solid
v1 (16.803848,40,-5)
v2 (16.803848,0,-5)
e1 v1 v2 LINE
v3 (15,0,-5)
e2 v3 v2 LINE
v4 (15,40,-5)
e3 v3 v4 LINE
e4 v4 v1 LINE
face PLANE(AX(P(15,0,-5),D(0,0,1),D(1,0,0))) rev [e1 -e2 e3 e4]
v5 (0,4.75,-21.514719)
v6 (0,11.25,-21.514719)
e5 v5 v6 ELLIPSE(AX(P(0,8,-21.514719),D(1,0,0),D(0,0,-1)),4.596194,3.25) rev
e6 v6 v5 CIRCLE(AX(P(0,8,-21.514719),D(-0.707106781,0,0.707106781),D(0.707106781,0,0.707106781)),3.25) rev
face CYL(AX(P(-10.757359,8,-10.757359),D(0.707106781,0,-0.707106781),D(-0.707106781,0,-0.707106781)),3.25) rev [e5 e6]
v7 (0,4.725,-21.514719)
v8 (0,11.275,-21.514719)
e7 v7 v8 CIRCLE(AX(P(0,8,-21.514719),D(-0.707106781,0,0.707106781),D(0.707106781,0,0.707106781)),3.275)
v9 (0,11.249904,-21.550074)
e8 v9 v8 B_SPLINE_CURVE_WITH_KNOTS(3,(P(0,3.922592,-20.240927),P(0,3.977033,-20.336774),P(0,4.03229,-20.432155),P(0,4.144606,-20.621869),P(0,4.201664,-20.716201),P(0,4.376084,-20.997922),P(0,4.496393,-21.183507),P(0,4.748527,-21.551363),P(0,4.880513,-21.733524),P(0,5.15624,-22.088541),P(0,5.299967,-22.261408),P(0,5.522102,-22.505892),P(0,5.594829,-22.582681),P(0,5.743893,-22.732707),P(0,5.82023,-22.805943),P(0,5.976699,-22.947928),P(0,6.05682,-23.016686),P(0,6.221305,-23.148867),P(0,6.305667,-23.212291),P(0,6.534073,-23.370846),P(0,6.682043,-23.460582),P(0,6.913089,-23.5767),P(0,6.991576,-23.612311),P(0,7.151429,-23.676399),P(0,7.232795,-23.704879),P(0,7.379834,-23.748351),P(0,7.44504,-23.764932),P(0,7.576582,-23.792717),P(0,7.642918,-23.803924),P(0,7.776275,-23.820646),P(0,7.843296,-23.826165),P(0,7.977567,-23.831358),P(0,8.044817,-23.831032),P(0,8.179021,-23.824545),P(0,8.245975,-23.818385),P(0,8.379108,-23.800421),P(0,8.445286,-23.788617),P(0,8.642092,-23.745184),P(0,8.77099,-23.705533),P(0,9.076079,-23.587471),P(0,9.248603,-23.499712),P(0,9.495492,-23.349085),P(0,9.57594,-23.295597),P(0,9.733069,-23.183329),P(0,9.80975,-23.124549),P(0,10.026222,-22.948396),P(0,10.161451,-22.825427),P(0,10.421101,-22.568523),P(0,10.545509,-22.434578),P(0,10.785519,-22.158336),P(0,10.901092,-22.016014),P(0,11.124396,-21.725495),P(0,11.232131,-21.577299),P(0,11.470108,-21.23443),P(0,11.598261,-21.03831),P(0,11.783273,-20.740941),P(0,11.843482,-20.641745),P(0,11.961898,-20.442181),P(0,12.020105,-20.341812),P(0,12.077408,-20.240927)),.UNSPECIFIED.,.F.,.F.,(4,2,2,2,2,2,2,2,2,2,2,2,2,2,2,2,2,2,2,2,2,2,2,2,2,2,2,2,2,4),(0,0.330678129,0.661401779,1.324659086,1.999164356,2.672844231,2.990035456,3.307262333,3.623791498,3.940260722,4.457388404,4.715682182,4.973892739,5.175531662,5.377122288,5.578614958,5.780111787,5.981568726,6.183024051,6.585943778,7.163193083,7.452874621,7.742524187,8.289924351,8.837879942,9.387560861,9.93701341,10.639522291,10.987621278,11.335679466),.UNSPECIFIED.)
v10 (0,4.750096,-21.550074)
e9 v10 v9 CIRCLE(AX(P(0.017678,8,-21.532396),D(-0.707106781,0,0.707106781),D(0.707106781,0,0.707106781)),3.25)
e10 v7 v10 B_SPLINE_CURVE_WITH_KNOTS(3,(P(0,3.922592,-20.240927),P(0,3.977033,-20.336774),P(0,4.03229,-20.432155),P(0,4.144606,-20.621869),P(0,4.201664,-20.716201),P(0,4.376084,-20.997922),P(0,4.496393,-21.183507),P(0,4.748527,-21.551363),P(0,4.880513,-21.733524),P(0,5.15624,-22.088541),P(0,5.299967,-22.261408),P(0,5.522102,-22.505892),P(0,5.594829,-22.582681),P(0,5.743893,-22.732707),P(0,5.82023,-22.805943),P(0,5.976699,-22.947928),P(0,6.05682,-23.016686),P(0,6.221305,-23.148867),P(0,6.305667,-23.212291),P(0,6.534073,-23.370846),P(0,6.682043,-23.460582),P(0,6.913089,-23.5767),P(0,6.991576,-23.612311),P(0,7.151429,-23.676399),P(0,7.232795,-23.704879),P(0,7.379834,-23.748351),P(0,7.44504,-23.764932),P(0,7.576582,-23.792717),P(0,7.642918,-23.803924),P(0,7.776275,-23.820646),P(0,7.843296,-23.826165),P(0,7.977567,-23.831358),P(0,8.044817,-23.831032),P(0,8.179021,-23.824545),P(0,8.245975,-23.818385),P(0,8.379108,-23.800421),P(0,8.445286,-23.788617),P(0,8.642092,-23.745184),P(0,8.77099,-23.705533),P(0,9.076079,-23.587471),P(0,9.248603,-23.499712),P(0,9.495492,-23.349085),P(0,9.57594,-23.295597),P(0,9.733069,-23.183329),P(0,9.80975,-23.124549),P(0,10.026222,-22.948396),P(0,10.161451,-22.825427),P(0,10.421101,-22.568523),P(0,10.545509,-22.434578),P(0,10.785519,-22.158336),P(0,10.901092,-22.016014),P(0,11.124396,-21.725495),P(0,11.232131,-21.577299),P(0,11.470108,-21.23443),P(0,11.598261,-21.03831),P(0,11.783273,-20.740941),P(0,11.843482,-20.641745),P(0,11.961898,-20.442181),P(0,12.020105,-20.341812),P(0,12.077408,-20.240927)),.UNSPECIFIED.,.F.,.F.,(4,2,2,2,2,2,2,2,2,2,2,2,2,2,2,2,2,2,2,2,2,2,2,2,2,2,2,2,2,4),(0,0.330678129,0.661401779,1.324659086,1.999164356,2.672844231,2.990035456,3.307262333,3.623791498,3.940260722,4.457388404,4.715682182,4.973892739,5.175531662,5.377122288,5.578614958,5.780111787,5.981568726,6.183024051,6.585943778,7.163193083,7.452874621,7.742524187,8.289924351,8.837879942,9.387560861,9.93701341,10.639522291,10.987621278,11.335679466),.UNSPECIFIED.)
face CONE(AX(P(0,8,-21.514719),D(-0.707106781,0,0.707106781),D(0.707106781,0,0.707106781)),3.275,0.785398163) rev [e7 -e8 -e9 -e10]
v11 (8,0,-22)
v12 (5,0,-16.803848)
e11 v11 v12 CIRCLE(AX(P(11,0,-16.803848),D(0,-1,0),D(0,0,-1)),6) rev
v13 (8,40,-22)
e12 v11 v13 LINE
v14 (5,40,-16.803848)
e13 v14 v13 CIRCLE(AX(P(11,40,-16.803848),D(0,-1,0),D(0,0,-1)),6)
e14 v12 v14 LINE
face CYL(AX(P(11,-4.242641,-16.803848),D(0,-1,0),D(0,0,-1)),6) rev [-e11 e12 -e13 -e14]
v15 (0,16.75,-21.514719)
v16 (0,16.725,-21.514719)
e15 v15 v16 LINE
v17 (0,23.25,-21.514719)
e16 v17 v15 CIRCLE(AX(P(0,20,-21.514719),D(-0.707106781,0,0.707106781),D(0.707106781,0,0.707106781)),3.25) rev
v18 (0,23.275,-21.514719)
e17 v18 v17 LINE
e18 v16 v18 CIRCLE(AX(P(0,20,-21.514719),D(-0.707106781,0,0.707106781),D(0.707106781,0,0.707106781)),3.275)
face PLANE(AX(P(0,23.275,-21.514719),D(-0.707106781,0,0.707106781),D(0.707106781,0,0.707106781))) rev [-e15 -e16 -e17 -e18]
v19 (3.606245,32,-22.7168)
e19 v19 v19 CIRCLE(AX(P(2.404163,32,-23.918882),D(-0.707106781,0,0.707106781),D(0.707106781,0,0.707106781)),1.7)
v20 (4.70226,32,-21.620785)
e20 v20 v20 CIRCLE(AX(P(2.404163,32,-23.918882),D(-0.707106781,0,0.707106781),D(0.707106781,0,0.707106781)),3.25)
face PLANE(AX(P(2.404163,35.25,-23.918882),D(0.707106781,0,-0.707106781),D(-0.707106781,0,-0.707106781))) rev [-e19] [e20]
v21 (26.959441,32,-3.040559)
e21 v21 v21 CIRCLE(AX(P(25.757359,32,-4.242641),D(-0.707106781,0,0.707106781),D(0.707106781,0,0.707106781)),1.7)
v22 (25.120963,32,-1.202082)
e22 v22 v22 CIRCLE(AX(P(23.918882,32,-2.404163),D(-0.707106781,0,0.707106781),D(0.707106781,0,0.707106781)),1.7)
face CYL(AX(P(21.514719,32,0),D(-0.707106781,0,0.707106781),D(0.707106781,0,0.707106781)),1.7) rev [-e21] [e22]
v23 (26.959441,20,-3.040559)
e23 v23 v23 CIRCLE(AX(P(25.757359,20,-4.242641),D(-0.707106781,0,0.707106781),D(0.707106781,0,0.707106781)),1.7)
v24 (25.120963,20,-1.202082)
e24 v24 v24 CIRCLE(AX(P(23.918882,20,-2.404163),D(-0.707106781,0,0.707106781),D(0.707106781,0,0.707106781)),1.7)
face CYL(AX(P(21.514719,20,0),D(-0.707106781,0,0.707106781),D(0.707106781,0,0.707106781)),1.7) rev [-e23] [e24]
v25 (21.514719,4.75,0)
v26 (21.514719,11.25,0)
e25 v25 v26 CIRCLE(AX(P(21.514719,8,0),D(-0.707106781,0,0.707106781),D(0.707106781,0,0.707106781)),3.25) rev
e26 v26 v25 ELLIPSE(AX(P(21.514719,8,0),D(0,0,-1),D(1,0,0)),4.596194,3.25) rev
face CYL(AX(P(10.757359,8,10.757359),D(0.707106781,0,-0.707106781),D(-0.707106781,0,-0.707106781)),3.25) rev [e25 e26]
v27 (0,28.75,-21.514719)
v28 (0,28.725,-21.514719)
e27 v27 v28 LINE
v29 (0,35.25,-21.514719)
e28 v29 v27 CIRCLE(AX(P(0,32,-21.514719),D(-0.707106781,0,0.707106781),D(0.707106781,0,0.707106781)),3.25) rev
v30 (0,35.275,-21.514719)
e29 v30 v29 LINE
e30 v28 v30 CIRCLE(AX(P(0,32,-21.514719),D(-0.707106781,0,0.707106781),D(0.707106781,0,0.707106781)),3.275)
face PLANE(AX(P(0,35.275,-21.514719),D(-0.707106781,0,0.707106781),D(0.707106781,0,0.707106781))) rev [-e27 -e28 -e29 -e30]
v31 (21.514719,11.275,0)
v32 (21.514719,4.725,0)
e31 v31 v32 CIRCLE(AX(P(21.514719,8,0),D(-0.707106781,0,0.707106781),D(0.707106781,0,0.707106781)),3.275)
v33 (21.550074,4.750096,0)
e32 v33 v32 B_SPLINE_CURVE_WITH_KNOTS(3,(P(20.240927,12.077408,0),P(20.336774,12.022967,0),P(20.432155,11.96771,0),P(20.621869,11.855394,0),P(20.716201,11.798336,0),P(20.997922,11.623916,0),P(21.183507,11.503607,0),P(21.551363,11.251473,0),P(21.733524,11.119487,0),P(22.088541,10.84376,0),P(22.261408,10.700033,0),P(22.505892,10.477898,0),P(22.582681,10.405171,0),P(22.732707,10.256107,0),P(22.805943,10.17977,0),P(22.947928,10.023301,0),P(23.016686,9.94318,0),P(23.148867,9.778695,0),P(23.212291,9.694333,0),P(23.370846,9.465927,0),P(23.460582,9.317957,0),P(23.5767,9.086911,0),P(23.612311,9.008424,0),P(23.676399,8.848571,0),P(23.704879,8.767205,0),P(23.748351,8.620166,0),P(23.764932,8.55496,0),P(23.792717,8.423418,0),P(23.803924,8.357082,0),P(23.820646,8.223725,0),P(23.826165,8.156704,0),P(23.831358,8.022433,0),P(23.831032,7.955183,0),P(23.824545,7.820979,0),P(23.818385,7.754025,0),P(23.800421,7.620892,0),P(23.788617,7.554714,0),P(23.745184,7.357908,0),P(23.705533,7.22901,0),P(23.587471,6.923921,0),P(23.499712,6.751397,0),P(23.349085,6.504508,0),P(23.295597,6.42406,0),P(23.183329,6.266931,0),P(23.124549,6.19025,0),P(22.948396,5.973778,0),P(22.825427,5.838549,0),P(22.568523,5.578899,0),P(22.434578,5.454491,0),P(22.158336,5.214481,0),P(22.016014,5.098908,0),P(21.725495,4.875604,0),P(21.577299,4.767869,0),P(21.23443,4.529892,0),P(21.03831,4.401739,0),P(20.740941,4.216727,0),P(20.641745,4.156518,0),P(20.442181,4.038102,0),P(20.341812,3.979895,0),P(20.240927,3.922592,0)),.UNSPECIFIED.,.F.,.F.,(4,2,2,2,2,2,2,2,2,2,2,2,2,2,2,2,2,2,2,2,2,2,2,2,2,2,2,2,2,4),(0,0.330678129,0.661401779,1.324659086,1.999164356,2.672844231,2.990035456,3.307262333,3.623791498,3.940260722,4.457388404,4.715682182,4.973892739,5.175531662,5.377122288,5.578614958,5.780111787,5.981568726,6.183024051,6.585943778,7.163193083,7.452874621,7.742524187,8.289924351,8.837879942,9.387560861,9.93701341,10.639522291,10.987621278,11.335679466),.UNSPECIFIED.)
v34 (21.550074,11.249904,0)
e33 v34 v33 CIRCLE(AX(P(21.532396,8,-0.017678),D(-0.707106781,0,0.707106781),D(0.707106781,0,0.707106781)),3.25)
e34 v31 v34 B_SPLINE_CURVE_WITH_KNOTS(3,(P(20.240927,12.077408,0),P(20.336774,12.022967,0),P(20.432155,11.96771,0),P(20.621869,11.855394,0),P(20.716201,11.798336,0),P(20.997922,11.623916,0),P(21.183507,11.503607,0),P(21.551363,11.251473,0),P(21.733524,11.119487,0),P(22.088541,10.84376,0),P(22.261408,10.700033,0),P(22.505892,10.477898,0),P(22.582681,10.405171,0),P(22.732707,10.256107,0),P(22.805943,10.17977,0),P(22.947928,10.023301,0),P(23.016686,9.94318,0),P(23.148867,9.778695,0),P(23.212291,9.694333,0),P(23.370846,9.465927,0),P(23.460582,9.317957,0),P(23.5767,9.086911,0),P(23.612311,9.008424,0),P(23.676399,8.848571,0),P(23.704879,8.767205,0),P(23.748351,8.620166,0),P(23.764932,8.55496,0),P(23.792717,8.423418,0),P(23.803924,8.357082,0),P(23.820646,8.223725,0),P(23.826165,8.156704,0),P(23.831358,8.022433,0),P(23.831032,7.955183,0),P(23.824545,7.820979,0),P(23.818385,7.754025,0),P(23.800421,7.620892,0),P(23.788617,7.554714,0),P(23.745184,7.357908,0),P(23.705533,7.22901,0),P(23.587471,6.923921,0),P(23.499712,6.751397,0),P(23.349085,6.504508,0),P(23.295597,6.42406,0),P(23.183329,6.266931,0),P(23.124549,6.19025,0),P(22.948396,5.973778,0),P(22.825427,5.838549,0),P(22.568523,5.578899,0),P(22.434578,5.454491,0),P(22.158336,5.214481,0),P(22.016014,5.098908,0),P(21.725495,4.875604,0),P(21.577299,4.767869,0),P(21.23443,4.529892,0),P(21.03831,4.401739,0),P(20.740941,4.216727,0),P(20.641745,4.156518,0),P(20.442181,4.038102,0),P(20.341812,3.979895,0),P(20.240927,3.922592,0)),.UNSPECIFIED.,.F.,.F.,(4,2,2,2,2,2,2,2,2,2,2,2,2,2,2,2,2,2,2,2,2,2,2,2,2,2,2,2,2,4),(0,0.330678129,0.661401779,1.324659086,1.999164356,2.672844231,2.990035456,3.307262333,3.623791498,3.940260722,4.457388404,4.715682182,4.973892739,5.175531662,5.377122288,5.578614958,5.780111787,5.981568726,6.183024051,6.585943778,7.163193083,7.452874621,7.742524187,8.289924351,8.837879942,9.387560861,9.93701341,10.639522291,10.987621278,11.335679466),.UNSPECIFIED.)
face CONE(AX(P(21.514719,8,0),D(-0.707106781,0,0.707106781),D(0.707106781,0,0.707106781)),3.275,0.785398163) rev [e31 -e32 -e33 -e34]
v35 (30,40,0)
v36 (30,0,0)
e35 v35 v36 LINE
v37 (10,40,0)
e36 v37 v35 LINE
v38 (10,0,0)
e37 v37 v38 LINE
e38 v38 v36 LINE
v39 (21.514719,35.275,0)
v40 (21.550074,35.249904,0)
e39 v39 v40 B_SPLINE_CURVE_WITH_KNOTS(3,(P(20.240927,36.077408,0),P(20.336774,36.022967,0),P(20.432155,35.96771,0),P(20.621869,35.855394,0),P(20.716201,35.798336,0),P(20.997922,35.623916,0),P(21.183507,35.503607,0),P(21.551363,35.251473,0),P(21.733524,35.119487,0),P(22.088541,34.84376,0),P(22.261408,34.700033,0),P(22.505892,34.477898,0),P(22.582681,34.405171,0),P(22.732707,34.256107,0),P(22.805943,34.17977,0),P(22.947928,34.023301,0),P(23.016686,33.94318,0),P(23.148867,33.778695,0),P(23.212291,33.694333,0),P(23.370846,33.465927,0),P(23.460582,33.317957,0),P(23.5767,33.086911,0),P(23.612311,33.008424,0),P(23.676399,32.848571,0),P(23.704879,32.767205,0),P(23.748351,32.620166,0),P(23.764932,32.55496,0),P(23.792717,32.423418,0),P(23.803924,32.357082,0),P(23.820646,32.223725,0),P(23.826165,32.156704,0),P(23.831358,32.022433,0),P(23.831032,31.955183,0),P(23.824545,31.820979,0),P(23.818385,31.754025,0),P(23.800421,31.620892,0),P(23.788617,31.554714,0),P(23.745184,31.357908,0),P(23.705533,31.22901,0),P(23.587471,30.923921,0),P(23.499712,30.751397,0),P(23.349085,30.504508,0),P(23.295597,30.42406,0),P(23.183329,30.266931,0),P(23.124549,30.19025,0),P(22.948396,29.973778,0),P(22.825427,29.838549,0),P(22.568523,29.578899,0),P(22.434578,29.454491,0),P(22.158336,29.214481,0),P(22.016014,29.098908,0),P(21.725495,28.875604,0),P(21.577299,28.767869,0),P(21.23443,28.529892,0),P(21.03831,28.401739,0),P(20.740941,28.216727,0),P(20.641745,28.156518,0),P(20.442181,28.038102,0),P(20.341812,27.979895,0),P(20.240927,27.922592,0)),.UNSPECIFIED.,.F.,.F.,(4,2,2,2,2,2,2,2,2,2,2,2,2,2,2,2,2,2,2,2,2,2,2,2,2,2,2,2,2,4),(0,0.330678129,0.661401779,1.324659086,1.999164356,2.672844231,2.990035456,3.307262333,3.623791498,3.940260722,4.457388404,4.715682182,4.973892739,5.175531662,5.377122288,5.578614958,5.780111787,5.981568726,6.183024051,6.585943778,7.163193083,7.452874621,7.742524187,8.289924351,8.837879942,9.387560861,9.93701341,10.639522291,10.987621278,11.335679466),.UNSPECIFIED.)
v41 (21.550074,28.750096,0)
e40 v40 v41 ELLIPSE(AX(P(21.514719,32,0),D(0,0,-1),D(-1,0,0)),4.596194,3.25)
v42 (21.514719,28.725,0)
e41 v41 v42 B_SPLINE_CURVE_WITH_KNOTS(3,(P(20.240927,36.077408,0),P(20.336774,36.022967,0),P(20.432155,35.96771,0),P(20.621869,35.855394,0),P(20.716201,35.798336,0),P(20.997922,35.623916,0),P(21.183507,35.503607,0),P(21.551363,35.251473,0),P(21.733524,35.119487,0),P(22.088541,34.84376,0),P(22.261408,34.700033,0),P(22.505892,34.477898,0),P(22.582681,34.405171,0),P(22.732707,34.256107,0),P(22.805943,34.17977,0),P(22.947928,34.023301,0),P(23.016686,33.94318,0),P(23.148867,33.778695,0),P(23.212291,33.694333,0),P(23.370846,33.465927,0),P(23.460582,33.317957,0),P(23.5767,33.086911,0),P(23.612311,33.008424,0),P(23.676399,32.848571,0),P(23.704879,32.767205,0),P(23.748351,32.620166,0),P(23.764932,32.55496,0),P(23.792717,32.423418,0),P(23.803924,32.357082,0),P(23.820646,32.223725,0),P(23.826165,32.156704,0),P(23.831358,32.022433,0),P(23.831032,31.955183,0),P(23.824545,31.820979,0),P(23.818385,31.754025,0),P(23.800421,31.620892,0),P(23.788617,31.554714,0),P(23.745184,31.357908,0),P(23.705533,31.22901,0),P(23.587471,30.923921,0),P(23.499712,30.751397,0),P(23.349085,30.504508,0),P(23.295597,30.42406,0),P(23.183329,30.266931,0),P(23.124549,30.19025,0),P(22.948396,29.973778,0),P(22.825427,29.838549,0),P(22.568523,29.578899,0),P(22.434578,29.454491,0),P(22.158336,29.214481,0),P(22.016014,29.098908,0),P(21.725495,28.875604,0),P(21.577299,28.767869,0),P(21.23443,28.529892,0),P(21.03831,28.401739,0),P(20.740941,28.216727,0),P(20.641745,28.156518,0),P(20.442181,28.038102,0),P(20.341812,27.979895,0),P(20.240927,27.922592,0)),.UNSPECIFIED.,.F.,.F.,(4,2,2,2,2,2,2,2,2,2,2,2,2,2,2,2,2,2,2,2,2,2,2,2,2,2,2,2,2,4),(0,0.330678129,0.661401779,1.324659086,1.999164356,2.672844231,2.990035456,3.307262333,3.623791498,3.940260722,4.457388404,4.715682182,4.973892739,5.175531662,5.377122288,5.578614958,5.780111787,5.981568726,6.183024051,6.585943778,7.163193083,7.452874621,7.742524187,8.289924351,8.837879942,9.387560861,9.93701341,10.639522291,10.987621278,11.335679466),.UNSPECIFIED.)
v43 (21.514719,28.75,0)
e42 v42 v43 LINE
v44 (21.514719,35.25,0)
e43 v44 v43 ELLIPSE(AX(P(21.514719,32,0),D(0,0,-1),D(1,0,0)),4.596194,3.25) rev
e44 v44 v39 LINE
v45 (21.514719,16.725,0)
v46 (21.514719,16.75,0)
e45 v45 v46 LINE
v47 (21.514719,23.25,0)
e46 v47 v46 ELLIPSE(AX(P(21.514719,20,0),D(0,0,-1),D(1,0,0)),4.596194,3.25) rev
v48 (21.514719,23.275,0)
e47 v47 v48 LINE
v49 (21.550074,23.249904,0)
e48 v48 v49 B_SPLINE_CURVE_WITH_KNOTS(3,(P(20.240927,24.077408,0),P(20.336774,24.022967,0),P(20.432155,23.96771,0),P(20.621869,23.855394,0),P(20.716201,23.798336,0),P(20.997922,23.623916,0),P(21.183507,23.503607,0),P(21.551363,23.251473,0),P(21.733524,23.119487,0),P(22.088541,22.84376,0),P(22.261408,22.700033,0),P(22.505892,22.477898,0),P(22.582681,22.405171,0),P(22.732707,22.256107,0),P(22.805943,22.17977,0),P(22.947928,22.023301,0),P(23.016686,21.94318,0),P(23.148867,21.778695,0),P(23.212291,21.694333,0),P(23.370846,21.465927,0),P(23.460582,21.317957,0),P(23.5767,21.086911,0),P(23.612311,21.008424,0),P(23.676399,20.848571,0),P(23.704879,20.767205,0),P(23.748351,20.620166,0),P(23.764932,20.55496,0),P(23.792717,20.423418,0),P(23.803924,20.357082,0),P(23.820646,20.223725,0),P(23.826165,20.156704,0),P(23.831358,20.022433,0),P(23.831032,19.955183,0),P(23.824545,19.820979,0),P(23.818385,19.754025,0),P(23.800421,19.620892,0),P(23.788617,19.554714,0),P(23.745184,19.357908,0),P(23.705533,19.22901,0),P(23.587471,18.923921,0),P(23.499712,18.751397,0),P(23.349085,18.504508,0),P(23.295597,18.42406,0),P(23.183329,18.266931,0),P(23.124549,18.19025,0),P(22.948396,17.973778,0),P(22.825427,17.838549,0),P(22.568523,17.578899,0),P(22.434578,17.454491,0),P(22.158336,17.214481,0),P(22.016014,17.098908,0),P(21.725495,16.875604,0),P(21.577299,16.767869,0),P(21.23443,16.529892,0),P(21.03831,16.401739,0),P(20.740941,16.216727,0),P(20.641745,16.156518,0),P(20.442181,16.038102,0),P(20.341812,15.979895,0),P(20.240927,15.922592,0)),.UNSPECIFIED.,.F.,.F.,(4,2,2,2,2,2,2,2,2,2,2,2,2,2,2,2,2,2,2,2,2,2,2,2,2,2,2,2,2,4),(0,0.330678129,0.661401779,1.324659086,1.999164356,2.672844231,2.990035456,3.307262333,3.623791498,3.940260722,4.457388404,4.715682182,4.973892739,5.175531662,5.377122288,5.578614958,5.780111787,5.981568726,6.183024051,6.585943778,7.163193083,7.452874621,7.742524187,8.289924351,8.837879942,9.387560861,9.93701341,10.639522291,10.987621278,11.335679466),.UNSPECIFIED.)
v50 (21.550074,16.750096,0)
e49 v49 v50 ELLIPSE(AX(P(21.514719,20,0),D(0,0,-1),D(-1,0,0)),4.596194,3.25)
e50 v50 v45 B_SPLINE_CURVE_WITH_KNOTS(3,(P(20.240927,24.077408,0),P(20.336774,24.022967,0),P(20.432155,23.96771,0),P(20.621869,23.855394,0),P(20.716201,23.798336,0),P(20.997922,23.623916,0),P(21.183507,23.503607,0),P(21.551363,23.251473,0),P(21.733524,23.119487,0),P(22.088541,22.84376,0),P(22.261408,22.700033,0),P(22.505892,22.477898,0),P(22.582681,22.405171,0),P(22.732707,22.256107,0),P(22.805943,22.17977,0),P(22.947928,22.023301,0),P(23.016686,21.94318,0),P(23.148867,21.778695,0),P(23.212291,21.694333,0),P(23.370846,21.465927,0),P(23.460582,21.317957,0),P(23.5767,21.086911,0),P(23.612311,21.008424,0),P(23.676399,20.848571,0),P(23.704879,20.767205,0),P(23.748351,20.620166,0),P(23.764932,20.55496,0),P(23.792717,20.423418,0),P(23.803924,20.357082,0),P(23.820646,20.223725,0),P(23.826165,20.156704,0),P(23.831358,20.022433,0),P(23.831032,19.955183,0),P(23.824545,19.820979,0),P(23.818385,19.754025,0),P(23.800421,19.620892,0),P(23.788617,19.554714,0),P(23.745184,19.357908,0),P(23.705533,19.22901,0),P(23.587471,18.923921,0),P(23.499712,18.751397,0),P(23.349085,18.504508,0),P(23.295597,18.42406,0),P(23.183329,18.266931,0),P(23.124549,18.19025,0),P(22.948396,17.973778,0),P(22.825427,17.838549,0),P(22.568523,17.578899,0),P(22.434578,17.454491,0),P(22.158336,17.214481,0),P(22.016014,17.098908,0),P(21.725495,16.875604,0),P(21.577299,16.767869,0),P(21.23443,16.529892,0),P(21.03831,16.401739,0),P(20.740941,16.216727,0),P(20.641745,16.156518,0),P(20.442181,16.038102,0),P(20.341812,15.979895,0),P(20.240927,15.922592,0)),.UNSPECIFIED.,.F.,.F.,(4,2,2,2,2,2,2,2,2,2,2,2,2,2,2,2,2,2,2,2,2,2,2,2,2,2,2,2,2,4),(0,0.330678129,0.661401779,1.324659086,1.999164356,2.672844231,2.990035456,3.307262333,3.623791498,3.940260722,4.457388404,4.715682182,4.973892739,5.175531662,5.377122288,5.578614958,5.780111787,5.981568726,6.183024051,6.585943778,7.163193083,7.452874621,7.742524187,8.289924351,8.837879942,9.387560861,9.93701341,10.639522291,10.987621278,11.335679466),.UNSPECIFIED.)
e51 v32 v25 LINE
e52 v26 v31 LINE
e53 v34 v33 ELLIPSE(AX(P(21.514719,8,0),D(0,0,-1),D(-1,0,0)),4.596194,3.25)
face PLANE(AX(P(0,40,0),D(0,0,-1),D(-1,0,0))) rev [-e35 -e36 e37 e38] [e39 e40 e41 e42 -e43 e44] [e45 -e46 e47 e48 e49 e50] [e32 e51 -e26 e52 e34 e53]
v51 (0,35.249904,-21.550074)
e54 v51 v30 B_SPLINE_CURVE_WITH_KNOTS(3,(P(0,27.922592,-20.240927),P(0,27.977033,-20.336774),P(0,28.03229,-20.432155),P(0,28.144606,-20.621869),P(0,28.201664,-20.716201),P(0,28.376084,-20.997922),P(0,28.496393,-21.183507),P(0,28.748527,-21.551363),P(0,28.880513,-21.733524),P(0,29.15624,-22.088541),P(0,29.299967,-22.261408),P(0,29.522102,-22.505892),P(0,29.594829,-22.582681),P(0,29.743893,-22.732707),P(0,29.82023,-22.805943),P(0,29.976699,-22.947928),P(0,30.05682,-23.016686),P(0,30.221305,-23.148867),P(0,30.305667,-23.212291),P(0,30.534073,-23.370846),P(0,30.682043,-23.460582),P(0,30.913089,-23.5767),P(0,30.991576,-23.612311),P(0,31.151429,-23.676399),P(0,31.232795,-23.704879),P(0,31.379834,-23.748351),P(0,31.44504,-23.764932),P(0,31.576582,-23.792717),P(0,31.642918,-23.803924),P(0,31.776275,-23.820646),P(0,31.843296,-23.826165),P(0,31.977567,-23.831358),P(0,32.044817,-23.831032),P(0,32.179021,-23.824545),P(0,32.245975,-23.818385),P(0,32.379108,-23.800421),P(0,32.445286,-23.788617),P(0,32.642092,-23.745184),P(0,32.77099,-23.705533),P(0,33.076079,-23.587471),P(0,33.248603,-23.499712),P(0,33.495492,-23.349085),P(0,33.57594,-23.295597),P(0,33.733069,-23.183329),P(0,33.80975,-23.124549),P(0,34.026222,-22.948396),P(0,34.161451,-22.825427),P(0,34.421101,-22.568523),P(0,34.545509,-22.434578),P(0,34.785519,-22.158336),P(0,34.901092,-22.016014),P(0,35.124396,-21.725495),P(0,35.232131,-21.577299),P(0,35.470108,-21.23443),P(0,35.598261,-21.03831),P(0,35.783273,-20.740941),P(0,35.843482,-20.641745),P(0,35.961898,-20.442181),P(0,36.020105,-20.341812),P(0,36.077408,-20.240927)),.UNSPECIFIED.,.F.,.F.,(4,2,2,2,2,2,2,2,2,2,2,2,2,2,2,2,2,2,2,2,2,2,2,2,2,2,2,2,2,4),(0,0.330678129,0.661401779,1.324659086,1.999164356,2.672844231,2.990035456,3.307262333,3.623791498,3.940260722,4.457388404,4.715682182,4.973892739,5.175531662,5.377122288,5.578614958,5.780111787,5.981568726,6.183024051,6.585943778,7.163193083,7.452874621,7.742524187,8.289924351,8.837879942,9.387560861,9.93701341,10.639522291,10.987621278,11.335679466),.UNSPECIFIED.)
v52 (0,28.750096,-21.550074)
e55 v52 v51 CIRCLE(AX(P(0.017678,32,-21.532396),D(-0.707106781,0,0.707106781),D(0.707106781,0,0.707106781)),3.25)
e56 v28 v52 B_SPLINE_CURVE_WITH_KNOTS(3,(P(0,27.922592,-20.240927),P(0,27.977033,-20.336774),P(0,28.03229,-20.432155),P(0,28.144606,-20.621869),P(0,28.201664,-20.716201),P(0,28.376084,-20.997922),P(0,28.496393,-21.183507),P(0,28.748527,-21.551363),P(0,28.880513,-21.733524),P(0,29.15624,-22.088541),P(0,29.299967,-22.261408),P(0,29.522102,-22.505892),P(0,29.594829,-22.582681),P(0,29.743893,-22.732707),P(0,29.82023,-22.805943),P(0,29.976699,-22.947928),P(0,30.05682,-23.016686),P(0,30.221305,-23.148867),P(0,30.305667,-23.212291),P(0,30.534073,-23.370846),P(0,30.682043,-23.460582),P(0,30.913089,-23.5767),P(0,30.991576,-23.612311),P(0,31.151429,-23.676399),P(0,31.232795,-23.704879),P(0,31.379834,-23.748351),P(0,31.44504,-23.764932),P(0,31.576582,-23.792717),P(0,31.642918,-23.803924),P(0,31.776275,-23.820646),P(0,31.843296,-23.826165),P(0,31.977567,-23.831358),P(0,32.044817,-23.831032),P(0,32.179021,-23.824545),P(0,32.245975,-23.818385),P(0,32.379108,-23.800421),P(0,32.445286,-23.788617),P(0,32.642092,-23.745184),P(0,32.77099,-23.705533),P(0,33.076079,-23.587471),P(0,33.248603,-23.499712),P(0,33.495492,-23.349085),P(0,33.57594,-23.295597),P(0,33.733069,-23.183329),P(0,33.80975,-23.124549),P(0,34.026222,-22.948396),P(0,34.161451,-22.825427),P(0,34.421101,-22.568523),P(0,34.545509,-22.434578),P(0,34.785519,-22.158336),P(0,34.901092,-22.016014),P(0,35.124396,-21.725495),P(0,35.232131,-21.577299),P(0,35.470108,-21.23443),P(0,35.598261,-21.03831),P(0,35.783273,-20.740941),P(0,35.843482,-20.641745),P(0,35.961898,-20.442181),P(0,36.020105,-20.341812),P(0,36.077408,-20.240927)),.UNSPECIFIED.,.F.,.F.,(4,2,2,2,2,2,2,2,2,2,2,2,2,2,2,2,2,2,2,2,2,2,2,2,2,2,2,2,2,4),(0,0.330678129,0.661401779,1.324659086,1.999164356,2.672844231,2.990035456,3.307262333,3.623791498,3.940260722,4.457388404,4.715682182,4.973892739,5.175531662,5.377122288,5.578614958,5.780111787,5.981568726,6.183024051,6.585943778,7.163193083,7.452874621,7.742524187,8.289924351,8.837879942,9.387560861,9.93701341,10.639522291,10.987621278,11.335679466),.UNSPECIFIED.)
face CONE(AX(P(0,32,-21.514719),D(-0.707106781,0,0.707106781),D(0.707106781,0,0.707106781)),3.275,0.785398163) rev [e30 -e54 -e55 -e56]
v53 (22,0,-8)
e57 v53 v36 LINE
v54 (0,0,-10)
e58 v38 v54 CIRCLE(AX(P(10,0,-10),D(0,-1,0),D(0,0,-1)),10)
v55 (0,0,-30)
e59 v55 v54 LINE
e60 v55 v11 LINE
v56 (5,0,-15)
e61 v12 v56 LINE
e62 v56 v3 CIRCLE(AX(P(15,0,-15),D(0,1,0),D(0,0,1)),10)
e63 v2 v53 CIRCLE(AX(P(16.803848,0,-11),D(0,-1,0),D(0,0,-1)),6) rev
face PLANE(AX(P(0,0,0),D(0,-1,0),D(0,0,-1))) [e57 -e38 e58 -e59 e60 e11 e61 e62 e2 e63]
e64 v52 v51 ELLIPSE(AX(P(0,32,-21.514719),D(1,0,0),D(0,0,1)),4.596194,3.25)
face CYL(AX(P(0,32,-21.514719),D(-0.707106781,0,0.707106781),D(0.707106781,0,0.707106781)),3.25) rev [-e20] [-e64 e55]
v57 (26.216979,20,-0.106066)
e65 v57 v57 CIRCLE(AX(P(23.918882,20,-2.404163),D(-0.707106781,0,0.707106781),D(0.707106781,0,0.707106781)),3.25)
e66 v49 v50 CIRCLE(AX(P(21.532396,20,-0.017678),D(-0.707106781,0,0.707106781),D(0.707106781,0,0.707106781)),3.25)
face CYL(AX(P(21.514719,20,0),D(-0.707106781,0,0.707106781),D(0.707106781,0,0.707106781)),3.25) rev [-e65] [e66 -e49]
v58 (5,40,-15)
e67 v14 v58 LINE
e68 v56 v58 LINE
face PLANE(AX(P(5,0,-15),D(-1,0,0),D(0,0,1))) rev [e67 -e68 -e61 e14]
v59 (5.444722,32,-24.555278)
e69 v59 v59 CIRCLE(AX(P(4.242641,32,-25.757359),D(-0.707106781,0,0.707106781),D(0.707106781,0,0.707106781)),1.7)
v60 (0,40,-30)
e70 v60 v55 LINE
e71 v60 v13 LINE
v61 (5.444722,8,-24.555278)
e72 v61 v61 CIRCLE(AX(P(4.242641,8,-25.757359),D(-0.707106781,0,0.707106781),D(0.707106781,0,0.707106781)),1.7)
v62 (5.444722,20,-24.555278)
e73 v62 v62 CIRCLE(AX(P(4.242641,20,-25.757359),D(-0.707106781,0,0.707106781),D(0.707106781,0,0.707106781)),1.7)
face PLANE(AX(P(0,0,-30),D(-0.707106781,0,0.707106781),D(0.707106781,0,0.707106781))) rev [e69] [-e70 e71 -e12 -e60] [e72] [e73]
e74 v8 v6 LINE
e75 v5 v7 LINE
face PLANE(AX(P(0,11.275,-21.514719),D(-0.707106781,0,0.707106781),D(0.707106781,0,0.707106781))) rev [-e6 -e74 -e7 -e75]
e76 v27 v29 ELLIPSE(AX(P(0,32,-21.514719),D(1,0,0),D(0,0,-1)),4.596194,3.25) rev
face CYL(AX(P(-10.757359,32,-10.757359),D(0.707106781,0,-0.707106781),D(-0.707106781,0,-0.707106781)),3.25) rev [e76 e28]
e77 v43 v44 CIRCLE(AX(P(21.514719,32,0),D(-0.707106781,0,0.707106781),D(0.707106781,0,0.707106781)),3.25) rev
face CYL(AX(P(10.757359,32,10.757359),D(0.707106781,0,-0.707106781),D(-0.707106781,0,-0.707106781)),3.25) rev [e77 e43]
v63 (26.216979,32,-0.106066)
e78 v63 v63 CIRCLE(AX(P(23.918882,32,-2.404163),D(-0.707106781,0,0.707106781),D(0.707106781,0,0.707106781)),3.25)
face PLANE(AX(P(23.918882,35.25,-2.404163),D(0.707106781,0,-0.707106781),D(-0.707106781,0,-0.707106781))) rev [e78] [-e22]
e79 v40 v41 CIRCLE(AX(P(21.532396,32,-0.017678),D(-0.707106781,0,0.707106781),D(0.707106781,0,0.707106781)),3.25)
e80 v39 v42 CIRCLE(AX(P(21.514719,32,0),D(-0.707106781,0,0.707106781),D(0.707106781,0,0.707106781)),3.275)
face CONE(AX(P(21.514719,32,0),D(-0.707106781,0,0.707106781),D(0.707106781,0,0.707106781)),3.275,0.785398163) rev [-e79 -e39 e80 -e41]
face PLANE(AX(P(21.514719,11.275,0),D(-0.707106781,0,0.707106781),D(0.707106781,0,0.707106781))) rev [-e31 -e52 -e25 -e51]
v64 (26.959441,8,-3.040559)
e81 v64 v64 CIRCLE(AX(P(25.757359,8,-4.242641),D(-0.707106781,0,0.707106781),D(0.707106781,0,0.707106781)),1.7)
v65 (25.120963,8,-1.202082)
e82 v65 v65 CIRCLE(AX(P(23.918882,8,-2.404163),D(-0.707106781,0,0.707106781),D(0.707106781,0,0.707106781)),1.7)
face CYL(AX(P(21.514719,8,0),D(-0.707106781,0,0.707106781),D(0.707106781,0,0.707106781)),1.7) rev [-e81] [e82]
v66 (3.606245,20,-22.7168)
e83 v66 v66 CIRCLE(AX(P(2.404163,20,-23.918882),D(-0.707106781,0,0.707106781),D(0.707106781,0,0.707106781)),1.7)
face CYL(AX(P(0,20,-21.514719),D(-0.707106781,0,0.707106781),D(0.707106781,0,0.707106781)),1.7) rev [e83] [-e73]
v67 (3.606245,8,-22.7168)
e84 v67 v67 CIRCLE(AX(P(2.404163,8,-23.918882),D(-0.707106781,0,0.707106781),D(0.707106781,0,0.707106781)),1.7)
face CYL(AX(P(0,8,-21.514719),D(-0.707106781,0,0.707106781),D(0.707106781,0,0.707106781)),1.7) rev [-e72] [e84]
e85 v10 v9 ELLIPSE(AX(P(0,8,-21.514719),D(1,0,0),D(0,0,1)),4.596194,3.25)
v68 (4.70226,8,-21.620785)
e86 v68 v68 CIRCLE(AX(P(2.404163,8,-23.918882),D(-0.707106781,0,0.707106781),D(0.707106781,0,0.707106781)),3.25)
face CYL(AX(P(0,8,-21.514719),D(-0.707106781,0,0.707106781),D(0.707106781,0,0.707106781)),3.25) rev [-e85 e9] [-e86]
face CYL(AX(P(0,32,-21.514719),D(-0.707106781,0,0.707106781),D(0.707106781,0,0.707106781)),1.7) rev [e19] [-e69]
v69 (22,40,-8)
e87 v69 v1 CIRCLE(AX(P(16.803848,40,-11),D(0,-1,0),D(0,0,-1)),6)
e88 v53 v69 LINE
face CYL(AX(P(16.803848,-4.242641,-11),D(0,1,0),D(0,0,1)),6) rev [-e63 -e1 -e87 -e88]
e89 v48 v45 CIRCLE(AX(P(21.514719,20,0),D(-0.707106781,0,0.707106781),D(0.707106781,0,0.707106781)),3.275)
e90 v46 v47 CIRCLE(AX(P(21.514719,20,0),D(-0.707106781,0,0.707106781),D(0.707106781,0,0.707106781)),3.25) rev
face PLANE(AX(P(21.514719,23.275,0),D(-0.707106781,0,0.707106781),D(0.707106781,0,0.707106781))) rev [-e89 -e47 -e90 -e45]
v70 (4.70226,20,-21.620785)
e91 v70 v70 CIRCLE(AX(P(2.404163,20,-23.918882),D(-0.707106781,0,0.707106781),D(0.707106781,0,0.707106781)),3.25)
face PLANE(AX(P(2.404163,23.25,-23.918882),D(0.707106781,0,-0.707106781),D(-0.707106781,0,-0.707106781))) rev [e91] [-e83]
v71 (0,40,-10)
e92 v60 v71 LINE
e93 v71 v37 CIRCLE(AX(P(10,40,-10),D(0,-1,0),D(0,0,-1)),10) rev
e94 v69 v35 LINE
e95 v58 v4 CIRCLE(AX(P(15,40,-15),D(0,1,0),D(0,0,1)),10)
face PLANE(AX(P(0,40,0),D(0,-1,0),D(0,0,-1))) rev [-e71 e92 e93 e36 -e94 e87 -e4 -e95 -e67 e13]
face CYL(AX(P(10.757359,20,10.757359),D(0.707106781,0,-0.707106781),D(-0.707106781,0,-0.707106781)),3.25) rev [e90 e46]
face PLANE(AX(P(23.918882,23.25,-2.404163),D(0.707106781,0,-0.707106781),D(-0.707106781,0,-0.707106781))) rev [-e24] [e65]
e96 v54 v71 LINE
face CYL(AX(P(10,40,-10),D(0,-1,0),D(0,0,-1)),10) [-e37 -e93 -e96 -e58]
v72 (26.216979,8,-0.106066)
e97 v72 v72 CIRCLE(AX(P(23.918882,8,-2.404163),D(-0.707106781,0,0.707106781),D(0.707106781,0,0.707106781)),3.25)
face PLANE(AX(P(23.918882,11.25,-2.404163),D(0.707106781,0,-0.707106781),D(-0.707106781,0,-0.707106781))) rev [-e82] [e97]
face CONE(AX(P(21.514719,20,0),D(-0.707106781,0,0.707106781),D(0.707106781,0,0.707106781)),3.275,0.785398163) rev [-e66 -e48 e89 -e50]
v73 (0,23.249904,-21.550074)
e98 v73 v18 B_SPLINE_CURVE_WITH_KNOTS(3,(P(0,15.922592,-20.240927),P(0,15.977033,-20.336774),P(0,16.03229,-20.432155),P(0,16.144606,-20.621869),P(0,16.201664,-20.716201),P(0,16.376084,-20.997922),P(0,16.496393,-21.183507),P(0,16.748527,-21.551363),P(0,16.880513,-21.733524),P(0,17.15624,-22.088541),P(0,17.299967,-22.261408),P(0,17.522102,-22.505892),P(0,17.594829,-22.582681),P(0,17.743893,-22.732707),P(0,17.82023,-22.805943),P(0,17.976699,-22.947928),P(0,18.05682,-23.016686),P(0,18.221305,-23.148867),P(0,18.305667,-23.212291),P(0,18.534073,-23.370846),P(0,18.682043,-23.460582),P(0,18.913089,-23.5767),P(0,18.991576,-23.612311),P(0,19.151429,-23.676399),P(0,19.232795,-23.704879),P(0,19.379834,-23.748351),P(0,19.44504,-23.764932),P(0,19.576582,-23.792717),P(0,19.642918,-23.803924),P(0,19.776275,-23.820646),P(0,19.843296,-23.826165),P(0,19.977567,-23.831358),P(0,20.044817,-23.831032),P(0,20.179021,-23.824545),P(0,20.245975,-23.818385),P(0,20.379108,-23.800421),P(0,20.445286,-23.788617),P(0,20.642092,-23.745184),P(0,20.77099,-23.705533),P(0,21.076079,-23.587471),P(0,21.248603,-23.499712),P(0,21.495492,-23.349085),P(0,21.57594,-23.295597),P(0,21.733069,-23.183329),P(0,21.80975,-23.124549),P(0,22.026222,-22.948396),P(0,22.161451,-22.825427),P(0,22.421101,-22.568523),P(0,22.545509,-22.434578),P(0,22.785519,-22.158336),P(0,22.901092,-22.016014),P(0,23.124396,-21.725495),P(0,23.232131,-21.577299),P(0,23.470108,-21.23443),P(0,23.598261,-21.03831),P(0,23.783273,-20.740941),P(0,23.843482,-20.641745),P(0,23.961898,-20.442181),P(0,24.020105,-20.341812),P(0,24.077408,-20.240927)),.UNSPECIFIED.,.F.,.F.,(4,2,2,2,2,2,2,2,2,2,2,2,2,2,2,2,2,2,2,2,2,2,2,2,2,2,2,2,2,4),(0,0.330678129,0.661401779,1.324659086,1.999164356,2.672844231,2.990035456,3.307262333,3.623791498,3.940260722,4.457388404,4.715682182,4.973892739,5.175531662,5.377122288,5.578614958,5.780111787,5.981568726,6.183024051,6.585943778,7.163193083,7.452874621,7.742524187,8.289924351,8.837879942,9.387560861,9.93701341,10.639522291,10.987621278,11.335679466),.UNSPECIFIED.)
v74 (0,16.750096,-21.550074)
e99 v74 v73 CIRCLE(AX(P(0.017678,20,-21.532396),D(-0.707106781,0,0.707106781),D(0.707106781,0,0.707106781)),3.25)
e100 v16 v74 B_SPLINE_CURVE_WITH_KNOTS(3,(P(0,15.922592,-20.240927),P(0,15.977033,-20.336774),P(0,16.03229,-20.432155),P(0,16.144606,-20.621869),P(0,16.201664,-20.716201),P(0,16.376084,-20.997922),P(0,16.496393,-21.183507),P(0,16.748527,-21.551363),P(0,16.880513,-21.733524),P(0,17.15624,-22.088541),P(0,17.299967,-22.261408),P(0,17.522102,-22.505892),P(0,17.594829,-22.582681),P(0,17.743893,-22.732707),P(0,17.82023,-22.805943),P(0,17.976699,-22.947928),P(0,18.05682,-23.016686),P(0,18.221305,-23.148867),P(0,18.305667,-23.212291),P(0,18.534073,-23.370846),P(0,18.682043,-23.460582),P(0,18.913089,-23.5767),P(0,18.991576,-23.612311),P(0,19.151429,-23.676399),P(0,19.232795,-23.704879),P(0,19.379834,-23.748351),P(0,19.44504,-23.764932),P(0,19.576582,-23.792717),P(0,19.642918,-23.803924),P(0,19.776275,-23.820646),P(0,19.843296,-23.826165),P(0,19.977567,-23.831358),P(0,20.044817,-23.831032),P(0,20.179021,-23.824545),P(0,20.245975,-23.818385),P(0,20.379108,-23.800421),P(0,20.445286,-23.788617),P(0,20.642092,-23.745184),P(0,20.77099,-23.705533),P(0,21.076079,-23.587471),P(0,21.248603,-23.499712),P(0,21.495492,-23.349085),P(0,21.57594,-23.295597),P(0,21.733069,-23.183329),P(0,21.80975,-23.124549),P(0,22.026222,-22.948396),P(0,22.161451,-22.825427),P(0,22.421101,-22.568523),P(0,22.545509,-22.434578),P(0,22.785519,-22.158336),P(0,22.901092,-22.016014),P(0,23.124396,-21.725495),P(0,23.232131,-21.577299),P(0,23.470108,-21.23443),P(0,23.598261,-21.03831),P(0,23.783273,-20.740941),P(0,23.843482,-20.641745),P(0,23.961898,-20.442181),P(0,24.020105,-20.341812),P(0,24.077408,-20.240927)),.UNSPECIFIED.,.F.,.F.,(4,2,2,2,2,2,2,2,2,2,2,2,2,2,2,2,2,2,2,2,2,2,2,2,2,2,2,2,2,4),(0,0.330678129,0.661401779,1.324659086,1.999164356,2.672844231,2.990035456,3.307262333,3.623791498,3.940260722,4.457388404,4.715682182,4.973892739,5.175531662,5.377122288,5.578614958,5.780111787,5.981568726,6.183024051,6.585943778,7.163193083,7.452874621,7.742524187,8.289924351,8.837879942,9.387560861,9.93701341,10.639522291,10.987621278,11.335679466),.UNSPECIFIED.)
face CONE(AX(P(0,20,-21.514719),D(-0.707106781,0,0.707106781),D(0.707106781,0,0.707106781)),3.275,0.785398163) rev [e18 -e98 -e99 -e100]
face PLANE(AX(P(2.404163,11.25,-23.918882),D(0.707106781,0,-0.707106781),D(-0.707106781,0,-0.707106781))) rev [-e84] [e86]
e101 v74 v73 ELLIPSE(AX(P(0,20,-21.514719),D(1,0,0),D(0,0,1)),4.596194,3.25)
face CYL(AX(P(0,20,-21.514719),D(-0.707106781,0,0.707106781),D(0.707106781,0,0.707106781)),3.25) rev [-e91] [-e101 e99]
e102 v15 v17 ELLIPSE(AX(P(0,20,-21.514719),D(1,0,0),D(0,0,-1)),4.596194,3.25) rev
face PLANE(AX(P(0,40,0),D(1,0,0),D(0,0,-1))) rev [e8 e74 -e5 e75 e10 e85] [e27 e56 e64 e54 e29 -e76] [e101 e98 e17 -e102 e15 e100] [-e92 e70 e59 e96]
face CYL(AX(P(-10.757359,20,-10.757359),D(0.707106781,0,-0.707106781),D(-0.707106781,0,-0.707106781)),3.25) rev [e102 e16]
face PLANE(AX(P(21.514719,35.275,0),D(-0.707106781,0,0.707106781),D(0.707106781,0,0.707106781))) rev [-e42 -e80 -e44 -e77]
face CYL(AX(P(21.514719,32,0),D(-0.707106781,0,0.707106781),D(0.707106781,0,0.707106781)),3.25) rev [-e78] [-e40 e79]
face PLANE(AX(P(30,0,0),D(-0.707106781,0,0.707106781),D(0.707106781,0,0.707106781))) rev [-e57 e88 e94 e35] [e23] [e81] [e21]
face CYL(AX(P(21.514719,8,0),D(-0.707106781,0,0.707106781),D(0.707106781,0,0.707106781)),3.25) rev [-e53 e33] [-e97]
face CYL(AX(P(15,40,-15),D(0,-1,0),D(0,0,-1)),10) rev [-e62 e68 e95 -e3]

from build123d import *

# Parameters (mm, degrees)
SKETCH1_W                                    = 30
SKETCH1_H                                    = 30
SKETCH1_R                                    = 10
BOSS_EXTRUDE1_DEPTH                          = 40
CUT_EXTRUDE1_DEPTH                           = 59.309518948
CUT_EXTRUDE2_DEPTH                           = 59.309518948
BOSS_EXTRUDE2_DEPTH                          = 40
FILLET1_R                                    = 6
M3_CLEARANCE_HOLE1_D                         = 3.2
M3_CLEARANCE_HOLE1_CSINK_D                   = 3.25
M3_CLEARANCE_HOLE1_CSINK_ANGLE               = 90
CBORE_FOR_M3_HEX_SOCKET_HEAD_CAP_SCR_2_COUNT = 2
CBORE_FOR_M3_HEX_SOCKET_HEAD_CAP_SCR_2_PITCH = 12
CBORE_FOR_M3_HEX_SOCKET_HEAD_CAP_SCR_3_COUNT = 2
CBORE_FOR_M3_HEX_SOCKET_HEAD_CAP_SCR_3_PITCH = 24
CBORE_FOR_M3_HEX_SOCKET_HEAD_CAP_SCR_4_COUNT = 2
CBORE_FOR_M3_HEX_SOCKET_HEAD_CAP_SCR_4_PITCH = 30.426406871
CBORE_FOR_M3_HEX_SOCKET_HEAD_CAP_SCR_5_COUNT = 2
CBORE_FOR_M3_HEX_SOCKET_HEAD_CAP_SCR_5_PITCH = 32.707281072
CBORE_FOR_M3_HEX_SOCKET_HEAD_CAP_SCR_6_COUNT = 2
CBORE_FOR_M3_HEX_SOCKET_HEAD_CAP_SCR_6_PITCH = 38.752628751
SKETCH10_R                                   = 3.25
CUT_EXTRUDE3_DEPTH                           = 47.55178469
FILLET2_R                                    = 10


with BuildPart() as part:
    # Sketch1 → Boss-Extrude1 (new body)
    with BuildSketch(Plane(origin=(0, 0, 0), x_dir=(1, 0, 0), z_dir=(0, 1, 0))):
        with Locations((15, 15)):
            Rectangle(SKETCH1_W, SKETCH1_H)
        with Locations(Location((15, 15, 0), (0, 0, 270))):
            Circle(SKETCH1_R, mode=Mode.SUBTRACT)
    extrude(amount=BOSS_EXTRUDE1_DEPTH)

    # Sketch2 → Cut-Extrude1 (cut, through all)
    with BuildSketch(Plane(origin=(0, 40, 0), x_dir=(1, 0, 0), z_dir=(0, 1, 0))):
        with BuildLine():
            Line((5, 15), (5, 30))
            Line((5, 30), (30, 30))
            Line((30, 30), (30, 5))
            Line((30, 5), (15, 5))
            ThreePointArc((15, 5), (7.928932188, 7.928932188), (5, 15))
        make_face()
    extrude(amount=-CUT_EXTRUDE1_DEPTH, mode=Mode.SUBTRACT)

    # Sketch3 → Cut-Extrude2 (cut, through all)
    with BuildSketch(Plane(origin=(0, 40, 0), x_dir=(1, 0, 0), z_dir=(0, 1, 0))):
        Polygon((0, 30), (5, 25), (5, 30), align=None)
        Polygon((30, 0), (25, 5), (30, 5), align=None)
    extrude(amount=-CUT_EXTRUDE2_DEPTH, mode=Mode.SUBTRACT)

    # Sketch7 → Boss-Extrude2 (add)
    with BuildSketch(Plane(origin=(0, 40, 0), x_dir=(1, 0, 0), z_dir=(0, 1, 0))):
        Polygon((5, 25), (8, 22), (5, 22), align=None)
        Polygon((25, 5), (22, 8), (22, 5), align=None)
    extrude(amount=-BOSS_EXTRUDE2_DEPTH)

    # Fillet1
    # the kernel refuses this fillet: 6 mm, written as the material it adds along each edge
    with BuildSketch(Plane(origin=(5, 40, -22), x_dir=(1, 0, 0), z_dir=(0, -1, 0))) as fillet1_piece_1_section:
        with BuildLine():
            CenterArc((6, 5.196152423), FILLET1_R, 180, 60)
            Line((0, 5.196152423), (-0.12, 5.196152423))
            Line((-0.12, 5.196152423), (-0.12, 0))
            Line((-0.12, 0), (0, -0.12))
            ThreePointArc((0, -0.12), (1.5, -0.12), (2.94, -0.103923048))
            Line((2.94, -0.103923048), (3, 0))
        make_face()
    fillet1_piece_1 = extrude(amount=40, mode=Mode.PRIVATE)
    fillet1_piece_1 = split(fillet1_piece_1, bisect_by=Plane(origin=(7.537314478, 20, -22.462685522), z_dir=(-0.7071067811865479, 0, 0.7071067811865474)), keep=Keep.TOP, mode=Mode.PRIVATE)
    add(fillet1_piece_1)
    with BuildSketch(Plane(origin=(22, 40, -5), x_dir=(-1, 0, 0), z_dir=(0, -1, 0))) as fillet1_piece_2_section:
        with BuildLine():
            CenterArc((5.196152423, 6), FILLET1_R, 210, 60)
            Line((0, 3), (-0.103923048, 2.94))
            ThreePointArc((-0.103923048, 2.94), (-0.12, 1.5), (-0.12, 0))
            Line((-0.12, 0), (0, -0.12))
            Line((0, -0.12), (5.196152423, -0.12))
            Line((5.196152423, -0.12), (5.196152423, 0))
        make_face()
    fillet1_piece_2 = extrude(amount=40, mode=Mode.PRIVATE)
    fillet1_piece_2 = split(fillet1_piece_2, bisect_by=Plane(origin=(22.462685522, 20, -7.537314478), z_dir=(-0.7071067811865436, 0, 0.7071067811865516)), keep=Keep.TOP, mode=Mode.PRIVATE)
    add(fillet1_piece_2)

    # M3 Clearance Hole1 (through all)
    with Locations(Plane(origin=(15, 0, -15), x_dir=(-0.7071067811865475, 0, -0.7071067811865476), z_dir=(0.7071067811865476, 0, -0.7071067811865475))):
        with Locations((-15.213203436, 32), (15.213203436, 32), (15.213203436, 20), (15.213203436, 8), (-15.213203436, 8), (-15.213203436, 20)):
            CounterSinkHole(M3_CLEARANCE_HOLE1_D / 2, M3_CLEARANCE_HOLE1_CSINK_D / 2, counter_sink_angle=M3_CLEARANCE_HOLE1_CSINK_ANGLE)

    # Sketch9 → CBORE for M3 Hex Socket Head Cap Screw1 (revolve, cut)
    with BuildSketch(Plane(origin=(21.514718626, 32, 0), x_dir=(0.7071067811865515, 0, 0.7071067811865436), z_dir=(0, 1, 0))):
        Polygon((0, 0), (0, 27.213203436), (1.7, 27.213203436), (1.7, 3.4), (3.25, 3.4), (3.25, 0.025), (3.275, 0), align=None)
    cbore_for_m3_hex_socket_head_cap_screw1 = revolve(axis=Axis((17.024590565, 32, 4.490128061), (0.7071067811865436, 0, -0.7071067811865515)), mode=Mode.SUBTRACT)

    # CBORE for M3 Hex Socket Head Cap Scr 2: CBORE for M3 Hex Socket Head Cap Screw1 ×2
    with Locations(*[(0, -i * CBORE_FOR_M3_HEX_SOCKET_HEAD_CAP_SCR_2_PITCH, 0) for i in range(1, CBORE_FOR_M3_HEX_SOCKET_HEAD_CAP_SCR_2_COUNT)]):
        add(cbore_for_m3_hex_socket_head_cap_screw1, mode=Mode.SUBTRACT)

    # CBORE for M3 Hex Socket Head Cap Scr 3: CBORE for M3 Hex Socket Head Cap Screw1 ×2
    with Locations(*[(0, -i * CBORE_FOR_M3_HEX_SOCKET_HEAD_CAP_SCR_3_PITCH, 0) for i in range(1, CBORE_FOR_M3_HEX_SOCKET_HEAD_CAP_SCR_3_COUNT)]):
        add(cbore_for_m3_hex_socket_head_cap_screw1, mode=Mode.SUBTRACT)

    # CBORE for M3 Hex Socket Head Cap Scr 4: CBORE for M3 Hex Socket Head Cap Screw1 ×2
    with Locations(*[Vector(-0.7071067811865515, 0, -0.7071067811865437) * (i * CBORE_FOR_M3_HEX_SOCKET_HEAD_CAP_SCR_4_PITCH) for i in range(1, CBORE_FOR_M3_HEX_SOCKET_HEAD_CAP_SCR_4_COUNT)]):
        add(cbore_for_m3_hex_socket_head_cap_screw1, mode=Mode.SUBTRACT)

    # CBORE for M3 Hex Socket Head Cap Scr 5: CBORE for M3 Hex Socket Head Cap Screw1 ×2
    with Locations(*[Vector(-0.6577959989617107, -0.3668907841578198, -0.6577959989617034) * (i * CBORE_FOR_M3_HEX_SOCKET_HEAD_CAP_SCR_5_PITCH) for i in range(1, CBORE_FOR_M3_HEX_SOCKET_HEAD_CAP_SCR_5_COUNT)]):
        add(cbore_for_m3_hex_socket_head_cap_screw1, mode=Mode.SUBTRACT)

    # CBORE for M3 Hex Socket Head Cap Scr 6: CBORE for M3 Hex Socket Head Cap Screw1 ×2
    with Locations(*[Vector(-0.5551808824158828, -0.6193128253151639, -0.5551808824158766) * (i * CBORE_FOR_M3_HEX_SOCKET_HEAD_CAP_SCR_6_PITCH) for i in range(1, CBORE_FOR_M3_HEX_SOCKET_HEAD_CAP_SCR_6_COUNT)]):
        add(cbore_for_m3_hex_socket_head_cap_screw1, mode=Mode.SUBTRACT)

    # Sketch10 → Cut-Extrude3 (cut, through all)
    with BuildSketch(Plane(origin=(13.161522369, 0, -13.161522369), x_dir=(0.7071067811865515, 0, 0.7071067811865436), z_dir=(-0.7071067811865436, 0, 0.7071067811865515))):
        with Locations((-15.213203436, 8)):
            Circle(SKETCH10_R)
        with Locations((-15.213203436, 20)):
            Circle(SKETCH10_R)
        with Locations((-15.213203436, 32)):
            Circle(SKETCH10_R)
        with Locations((15.213203436, 32)):
            Circle(SKETCH10_R)
        with Locations((15.213203436, 20)):
            Circle(SKETCH10_R)
        with Locations((15.213203436, 8)):
            Circle(SKETCH10_R)
    extrude(amount=CUT_EXTRUDE3_DEPTH, mode=Mode.SUBTRACT)

    # Fillet2
    fillet2_edges = [part.edges().sort_by_distance(p)[0] for p in [
        (0, 20, 0),
    ]]
    fillet(fillet2_edges, radius=FILLET2_R)


solid = part.part
